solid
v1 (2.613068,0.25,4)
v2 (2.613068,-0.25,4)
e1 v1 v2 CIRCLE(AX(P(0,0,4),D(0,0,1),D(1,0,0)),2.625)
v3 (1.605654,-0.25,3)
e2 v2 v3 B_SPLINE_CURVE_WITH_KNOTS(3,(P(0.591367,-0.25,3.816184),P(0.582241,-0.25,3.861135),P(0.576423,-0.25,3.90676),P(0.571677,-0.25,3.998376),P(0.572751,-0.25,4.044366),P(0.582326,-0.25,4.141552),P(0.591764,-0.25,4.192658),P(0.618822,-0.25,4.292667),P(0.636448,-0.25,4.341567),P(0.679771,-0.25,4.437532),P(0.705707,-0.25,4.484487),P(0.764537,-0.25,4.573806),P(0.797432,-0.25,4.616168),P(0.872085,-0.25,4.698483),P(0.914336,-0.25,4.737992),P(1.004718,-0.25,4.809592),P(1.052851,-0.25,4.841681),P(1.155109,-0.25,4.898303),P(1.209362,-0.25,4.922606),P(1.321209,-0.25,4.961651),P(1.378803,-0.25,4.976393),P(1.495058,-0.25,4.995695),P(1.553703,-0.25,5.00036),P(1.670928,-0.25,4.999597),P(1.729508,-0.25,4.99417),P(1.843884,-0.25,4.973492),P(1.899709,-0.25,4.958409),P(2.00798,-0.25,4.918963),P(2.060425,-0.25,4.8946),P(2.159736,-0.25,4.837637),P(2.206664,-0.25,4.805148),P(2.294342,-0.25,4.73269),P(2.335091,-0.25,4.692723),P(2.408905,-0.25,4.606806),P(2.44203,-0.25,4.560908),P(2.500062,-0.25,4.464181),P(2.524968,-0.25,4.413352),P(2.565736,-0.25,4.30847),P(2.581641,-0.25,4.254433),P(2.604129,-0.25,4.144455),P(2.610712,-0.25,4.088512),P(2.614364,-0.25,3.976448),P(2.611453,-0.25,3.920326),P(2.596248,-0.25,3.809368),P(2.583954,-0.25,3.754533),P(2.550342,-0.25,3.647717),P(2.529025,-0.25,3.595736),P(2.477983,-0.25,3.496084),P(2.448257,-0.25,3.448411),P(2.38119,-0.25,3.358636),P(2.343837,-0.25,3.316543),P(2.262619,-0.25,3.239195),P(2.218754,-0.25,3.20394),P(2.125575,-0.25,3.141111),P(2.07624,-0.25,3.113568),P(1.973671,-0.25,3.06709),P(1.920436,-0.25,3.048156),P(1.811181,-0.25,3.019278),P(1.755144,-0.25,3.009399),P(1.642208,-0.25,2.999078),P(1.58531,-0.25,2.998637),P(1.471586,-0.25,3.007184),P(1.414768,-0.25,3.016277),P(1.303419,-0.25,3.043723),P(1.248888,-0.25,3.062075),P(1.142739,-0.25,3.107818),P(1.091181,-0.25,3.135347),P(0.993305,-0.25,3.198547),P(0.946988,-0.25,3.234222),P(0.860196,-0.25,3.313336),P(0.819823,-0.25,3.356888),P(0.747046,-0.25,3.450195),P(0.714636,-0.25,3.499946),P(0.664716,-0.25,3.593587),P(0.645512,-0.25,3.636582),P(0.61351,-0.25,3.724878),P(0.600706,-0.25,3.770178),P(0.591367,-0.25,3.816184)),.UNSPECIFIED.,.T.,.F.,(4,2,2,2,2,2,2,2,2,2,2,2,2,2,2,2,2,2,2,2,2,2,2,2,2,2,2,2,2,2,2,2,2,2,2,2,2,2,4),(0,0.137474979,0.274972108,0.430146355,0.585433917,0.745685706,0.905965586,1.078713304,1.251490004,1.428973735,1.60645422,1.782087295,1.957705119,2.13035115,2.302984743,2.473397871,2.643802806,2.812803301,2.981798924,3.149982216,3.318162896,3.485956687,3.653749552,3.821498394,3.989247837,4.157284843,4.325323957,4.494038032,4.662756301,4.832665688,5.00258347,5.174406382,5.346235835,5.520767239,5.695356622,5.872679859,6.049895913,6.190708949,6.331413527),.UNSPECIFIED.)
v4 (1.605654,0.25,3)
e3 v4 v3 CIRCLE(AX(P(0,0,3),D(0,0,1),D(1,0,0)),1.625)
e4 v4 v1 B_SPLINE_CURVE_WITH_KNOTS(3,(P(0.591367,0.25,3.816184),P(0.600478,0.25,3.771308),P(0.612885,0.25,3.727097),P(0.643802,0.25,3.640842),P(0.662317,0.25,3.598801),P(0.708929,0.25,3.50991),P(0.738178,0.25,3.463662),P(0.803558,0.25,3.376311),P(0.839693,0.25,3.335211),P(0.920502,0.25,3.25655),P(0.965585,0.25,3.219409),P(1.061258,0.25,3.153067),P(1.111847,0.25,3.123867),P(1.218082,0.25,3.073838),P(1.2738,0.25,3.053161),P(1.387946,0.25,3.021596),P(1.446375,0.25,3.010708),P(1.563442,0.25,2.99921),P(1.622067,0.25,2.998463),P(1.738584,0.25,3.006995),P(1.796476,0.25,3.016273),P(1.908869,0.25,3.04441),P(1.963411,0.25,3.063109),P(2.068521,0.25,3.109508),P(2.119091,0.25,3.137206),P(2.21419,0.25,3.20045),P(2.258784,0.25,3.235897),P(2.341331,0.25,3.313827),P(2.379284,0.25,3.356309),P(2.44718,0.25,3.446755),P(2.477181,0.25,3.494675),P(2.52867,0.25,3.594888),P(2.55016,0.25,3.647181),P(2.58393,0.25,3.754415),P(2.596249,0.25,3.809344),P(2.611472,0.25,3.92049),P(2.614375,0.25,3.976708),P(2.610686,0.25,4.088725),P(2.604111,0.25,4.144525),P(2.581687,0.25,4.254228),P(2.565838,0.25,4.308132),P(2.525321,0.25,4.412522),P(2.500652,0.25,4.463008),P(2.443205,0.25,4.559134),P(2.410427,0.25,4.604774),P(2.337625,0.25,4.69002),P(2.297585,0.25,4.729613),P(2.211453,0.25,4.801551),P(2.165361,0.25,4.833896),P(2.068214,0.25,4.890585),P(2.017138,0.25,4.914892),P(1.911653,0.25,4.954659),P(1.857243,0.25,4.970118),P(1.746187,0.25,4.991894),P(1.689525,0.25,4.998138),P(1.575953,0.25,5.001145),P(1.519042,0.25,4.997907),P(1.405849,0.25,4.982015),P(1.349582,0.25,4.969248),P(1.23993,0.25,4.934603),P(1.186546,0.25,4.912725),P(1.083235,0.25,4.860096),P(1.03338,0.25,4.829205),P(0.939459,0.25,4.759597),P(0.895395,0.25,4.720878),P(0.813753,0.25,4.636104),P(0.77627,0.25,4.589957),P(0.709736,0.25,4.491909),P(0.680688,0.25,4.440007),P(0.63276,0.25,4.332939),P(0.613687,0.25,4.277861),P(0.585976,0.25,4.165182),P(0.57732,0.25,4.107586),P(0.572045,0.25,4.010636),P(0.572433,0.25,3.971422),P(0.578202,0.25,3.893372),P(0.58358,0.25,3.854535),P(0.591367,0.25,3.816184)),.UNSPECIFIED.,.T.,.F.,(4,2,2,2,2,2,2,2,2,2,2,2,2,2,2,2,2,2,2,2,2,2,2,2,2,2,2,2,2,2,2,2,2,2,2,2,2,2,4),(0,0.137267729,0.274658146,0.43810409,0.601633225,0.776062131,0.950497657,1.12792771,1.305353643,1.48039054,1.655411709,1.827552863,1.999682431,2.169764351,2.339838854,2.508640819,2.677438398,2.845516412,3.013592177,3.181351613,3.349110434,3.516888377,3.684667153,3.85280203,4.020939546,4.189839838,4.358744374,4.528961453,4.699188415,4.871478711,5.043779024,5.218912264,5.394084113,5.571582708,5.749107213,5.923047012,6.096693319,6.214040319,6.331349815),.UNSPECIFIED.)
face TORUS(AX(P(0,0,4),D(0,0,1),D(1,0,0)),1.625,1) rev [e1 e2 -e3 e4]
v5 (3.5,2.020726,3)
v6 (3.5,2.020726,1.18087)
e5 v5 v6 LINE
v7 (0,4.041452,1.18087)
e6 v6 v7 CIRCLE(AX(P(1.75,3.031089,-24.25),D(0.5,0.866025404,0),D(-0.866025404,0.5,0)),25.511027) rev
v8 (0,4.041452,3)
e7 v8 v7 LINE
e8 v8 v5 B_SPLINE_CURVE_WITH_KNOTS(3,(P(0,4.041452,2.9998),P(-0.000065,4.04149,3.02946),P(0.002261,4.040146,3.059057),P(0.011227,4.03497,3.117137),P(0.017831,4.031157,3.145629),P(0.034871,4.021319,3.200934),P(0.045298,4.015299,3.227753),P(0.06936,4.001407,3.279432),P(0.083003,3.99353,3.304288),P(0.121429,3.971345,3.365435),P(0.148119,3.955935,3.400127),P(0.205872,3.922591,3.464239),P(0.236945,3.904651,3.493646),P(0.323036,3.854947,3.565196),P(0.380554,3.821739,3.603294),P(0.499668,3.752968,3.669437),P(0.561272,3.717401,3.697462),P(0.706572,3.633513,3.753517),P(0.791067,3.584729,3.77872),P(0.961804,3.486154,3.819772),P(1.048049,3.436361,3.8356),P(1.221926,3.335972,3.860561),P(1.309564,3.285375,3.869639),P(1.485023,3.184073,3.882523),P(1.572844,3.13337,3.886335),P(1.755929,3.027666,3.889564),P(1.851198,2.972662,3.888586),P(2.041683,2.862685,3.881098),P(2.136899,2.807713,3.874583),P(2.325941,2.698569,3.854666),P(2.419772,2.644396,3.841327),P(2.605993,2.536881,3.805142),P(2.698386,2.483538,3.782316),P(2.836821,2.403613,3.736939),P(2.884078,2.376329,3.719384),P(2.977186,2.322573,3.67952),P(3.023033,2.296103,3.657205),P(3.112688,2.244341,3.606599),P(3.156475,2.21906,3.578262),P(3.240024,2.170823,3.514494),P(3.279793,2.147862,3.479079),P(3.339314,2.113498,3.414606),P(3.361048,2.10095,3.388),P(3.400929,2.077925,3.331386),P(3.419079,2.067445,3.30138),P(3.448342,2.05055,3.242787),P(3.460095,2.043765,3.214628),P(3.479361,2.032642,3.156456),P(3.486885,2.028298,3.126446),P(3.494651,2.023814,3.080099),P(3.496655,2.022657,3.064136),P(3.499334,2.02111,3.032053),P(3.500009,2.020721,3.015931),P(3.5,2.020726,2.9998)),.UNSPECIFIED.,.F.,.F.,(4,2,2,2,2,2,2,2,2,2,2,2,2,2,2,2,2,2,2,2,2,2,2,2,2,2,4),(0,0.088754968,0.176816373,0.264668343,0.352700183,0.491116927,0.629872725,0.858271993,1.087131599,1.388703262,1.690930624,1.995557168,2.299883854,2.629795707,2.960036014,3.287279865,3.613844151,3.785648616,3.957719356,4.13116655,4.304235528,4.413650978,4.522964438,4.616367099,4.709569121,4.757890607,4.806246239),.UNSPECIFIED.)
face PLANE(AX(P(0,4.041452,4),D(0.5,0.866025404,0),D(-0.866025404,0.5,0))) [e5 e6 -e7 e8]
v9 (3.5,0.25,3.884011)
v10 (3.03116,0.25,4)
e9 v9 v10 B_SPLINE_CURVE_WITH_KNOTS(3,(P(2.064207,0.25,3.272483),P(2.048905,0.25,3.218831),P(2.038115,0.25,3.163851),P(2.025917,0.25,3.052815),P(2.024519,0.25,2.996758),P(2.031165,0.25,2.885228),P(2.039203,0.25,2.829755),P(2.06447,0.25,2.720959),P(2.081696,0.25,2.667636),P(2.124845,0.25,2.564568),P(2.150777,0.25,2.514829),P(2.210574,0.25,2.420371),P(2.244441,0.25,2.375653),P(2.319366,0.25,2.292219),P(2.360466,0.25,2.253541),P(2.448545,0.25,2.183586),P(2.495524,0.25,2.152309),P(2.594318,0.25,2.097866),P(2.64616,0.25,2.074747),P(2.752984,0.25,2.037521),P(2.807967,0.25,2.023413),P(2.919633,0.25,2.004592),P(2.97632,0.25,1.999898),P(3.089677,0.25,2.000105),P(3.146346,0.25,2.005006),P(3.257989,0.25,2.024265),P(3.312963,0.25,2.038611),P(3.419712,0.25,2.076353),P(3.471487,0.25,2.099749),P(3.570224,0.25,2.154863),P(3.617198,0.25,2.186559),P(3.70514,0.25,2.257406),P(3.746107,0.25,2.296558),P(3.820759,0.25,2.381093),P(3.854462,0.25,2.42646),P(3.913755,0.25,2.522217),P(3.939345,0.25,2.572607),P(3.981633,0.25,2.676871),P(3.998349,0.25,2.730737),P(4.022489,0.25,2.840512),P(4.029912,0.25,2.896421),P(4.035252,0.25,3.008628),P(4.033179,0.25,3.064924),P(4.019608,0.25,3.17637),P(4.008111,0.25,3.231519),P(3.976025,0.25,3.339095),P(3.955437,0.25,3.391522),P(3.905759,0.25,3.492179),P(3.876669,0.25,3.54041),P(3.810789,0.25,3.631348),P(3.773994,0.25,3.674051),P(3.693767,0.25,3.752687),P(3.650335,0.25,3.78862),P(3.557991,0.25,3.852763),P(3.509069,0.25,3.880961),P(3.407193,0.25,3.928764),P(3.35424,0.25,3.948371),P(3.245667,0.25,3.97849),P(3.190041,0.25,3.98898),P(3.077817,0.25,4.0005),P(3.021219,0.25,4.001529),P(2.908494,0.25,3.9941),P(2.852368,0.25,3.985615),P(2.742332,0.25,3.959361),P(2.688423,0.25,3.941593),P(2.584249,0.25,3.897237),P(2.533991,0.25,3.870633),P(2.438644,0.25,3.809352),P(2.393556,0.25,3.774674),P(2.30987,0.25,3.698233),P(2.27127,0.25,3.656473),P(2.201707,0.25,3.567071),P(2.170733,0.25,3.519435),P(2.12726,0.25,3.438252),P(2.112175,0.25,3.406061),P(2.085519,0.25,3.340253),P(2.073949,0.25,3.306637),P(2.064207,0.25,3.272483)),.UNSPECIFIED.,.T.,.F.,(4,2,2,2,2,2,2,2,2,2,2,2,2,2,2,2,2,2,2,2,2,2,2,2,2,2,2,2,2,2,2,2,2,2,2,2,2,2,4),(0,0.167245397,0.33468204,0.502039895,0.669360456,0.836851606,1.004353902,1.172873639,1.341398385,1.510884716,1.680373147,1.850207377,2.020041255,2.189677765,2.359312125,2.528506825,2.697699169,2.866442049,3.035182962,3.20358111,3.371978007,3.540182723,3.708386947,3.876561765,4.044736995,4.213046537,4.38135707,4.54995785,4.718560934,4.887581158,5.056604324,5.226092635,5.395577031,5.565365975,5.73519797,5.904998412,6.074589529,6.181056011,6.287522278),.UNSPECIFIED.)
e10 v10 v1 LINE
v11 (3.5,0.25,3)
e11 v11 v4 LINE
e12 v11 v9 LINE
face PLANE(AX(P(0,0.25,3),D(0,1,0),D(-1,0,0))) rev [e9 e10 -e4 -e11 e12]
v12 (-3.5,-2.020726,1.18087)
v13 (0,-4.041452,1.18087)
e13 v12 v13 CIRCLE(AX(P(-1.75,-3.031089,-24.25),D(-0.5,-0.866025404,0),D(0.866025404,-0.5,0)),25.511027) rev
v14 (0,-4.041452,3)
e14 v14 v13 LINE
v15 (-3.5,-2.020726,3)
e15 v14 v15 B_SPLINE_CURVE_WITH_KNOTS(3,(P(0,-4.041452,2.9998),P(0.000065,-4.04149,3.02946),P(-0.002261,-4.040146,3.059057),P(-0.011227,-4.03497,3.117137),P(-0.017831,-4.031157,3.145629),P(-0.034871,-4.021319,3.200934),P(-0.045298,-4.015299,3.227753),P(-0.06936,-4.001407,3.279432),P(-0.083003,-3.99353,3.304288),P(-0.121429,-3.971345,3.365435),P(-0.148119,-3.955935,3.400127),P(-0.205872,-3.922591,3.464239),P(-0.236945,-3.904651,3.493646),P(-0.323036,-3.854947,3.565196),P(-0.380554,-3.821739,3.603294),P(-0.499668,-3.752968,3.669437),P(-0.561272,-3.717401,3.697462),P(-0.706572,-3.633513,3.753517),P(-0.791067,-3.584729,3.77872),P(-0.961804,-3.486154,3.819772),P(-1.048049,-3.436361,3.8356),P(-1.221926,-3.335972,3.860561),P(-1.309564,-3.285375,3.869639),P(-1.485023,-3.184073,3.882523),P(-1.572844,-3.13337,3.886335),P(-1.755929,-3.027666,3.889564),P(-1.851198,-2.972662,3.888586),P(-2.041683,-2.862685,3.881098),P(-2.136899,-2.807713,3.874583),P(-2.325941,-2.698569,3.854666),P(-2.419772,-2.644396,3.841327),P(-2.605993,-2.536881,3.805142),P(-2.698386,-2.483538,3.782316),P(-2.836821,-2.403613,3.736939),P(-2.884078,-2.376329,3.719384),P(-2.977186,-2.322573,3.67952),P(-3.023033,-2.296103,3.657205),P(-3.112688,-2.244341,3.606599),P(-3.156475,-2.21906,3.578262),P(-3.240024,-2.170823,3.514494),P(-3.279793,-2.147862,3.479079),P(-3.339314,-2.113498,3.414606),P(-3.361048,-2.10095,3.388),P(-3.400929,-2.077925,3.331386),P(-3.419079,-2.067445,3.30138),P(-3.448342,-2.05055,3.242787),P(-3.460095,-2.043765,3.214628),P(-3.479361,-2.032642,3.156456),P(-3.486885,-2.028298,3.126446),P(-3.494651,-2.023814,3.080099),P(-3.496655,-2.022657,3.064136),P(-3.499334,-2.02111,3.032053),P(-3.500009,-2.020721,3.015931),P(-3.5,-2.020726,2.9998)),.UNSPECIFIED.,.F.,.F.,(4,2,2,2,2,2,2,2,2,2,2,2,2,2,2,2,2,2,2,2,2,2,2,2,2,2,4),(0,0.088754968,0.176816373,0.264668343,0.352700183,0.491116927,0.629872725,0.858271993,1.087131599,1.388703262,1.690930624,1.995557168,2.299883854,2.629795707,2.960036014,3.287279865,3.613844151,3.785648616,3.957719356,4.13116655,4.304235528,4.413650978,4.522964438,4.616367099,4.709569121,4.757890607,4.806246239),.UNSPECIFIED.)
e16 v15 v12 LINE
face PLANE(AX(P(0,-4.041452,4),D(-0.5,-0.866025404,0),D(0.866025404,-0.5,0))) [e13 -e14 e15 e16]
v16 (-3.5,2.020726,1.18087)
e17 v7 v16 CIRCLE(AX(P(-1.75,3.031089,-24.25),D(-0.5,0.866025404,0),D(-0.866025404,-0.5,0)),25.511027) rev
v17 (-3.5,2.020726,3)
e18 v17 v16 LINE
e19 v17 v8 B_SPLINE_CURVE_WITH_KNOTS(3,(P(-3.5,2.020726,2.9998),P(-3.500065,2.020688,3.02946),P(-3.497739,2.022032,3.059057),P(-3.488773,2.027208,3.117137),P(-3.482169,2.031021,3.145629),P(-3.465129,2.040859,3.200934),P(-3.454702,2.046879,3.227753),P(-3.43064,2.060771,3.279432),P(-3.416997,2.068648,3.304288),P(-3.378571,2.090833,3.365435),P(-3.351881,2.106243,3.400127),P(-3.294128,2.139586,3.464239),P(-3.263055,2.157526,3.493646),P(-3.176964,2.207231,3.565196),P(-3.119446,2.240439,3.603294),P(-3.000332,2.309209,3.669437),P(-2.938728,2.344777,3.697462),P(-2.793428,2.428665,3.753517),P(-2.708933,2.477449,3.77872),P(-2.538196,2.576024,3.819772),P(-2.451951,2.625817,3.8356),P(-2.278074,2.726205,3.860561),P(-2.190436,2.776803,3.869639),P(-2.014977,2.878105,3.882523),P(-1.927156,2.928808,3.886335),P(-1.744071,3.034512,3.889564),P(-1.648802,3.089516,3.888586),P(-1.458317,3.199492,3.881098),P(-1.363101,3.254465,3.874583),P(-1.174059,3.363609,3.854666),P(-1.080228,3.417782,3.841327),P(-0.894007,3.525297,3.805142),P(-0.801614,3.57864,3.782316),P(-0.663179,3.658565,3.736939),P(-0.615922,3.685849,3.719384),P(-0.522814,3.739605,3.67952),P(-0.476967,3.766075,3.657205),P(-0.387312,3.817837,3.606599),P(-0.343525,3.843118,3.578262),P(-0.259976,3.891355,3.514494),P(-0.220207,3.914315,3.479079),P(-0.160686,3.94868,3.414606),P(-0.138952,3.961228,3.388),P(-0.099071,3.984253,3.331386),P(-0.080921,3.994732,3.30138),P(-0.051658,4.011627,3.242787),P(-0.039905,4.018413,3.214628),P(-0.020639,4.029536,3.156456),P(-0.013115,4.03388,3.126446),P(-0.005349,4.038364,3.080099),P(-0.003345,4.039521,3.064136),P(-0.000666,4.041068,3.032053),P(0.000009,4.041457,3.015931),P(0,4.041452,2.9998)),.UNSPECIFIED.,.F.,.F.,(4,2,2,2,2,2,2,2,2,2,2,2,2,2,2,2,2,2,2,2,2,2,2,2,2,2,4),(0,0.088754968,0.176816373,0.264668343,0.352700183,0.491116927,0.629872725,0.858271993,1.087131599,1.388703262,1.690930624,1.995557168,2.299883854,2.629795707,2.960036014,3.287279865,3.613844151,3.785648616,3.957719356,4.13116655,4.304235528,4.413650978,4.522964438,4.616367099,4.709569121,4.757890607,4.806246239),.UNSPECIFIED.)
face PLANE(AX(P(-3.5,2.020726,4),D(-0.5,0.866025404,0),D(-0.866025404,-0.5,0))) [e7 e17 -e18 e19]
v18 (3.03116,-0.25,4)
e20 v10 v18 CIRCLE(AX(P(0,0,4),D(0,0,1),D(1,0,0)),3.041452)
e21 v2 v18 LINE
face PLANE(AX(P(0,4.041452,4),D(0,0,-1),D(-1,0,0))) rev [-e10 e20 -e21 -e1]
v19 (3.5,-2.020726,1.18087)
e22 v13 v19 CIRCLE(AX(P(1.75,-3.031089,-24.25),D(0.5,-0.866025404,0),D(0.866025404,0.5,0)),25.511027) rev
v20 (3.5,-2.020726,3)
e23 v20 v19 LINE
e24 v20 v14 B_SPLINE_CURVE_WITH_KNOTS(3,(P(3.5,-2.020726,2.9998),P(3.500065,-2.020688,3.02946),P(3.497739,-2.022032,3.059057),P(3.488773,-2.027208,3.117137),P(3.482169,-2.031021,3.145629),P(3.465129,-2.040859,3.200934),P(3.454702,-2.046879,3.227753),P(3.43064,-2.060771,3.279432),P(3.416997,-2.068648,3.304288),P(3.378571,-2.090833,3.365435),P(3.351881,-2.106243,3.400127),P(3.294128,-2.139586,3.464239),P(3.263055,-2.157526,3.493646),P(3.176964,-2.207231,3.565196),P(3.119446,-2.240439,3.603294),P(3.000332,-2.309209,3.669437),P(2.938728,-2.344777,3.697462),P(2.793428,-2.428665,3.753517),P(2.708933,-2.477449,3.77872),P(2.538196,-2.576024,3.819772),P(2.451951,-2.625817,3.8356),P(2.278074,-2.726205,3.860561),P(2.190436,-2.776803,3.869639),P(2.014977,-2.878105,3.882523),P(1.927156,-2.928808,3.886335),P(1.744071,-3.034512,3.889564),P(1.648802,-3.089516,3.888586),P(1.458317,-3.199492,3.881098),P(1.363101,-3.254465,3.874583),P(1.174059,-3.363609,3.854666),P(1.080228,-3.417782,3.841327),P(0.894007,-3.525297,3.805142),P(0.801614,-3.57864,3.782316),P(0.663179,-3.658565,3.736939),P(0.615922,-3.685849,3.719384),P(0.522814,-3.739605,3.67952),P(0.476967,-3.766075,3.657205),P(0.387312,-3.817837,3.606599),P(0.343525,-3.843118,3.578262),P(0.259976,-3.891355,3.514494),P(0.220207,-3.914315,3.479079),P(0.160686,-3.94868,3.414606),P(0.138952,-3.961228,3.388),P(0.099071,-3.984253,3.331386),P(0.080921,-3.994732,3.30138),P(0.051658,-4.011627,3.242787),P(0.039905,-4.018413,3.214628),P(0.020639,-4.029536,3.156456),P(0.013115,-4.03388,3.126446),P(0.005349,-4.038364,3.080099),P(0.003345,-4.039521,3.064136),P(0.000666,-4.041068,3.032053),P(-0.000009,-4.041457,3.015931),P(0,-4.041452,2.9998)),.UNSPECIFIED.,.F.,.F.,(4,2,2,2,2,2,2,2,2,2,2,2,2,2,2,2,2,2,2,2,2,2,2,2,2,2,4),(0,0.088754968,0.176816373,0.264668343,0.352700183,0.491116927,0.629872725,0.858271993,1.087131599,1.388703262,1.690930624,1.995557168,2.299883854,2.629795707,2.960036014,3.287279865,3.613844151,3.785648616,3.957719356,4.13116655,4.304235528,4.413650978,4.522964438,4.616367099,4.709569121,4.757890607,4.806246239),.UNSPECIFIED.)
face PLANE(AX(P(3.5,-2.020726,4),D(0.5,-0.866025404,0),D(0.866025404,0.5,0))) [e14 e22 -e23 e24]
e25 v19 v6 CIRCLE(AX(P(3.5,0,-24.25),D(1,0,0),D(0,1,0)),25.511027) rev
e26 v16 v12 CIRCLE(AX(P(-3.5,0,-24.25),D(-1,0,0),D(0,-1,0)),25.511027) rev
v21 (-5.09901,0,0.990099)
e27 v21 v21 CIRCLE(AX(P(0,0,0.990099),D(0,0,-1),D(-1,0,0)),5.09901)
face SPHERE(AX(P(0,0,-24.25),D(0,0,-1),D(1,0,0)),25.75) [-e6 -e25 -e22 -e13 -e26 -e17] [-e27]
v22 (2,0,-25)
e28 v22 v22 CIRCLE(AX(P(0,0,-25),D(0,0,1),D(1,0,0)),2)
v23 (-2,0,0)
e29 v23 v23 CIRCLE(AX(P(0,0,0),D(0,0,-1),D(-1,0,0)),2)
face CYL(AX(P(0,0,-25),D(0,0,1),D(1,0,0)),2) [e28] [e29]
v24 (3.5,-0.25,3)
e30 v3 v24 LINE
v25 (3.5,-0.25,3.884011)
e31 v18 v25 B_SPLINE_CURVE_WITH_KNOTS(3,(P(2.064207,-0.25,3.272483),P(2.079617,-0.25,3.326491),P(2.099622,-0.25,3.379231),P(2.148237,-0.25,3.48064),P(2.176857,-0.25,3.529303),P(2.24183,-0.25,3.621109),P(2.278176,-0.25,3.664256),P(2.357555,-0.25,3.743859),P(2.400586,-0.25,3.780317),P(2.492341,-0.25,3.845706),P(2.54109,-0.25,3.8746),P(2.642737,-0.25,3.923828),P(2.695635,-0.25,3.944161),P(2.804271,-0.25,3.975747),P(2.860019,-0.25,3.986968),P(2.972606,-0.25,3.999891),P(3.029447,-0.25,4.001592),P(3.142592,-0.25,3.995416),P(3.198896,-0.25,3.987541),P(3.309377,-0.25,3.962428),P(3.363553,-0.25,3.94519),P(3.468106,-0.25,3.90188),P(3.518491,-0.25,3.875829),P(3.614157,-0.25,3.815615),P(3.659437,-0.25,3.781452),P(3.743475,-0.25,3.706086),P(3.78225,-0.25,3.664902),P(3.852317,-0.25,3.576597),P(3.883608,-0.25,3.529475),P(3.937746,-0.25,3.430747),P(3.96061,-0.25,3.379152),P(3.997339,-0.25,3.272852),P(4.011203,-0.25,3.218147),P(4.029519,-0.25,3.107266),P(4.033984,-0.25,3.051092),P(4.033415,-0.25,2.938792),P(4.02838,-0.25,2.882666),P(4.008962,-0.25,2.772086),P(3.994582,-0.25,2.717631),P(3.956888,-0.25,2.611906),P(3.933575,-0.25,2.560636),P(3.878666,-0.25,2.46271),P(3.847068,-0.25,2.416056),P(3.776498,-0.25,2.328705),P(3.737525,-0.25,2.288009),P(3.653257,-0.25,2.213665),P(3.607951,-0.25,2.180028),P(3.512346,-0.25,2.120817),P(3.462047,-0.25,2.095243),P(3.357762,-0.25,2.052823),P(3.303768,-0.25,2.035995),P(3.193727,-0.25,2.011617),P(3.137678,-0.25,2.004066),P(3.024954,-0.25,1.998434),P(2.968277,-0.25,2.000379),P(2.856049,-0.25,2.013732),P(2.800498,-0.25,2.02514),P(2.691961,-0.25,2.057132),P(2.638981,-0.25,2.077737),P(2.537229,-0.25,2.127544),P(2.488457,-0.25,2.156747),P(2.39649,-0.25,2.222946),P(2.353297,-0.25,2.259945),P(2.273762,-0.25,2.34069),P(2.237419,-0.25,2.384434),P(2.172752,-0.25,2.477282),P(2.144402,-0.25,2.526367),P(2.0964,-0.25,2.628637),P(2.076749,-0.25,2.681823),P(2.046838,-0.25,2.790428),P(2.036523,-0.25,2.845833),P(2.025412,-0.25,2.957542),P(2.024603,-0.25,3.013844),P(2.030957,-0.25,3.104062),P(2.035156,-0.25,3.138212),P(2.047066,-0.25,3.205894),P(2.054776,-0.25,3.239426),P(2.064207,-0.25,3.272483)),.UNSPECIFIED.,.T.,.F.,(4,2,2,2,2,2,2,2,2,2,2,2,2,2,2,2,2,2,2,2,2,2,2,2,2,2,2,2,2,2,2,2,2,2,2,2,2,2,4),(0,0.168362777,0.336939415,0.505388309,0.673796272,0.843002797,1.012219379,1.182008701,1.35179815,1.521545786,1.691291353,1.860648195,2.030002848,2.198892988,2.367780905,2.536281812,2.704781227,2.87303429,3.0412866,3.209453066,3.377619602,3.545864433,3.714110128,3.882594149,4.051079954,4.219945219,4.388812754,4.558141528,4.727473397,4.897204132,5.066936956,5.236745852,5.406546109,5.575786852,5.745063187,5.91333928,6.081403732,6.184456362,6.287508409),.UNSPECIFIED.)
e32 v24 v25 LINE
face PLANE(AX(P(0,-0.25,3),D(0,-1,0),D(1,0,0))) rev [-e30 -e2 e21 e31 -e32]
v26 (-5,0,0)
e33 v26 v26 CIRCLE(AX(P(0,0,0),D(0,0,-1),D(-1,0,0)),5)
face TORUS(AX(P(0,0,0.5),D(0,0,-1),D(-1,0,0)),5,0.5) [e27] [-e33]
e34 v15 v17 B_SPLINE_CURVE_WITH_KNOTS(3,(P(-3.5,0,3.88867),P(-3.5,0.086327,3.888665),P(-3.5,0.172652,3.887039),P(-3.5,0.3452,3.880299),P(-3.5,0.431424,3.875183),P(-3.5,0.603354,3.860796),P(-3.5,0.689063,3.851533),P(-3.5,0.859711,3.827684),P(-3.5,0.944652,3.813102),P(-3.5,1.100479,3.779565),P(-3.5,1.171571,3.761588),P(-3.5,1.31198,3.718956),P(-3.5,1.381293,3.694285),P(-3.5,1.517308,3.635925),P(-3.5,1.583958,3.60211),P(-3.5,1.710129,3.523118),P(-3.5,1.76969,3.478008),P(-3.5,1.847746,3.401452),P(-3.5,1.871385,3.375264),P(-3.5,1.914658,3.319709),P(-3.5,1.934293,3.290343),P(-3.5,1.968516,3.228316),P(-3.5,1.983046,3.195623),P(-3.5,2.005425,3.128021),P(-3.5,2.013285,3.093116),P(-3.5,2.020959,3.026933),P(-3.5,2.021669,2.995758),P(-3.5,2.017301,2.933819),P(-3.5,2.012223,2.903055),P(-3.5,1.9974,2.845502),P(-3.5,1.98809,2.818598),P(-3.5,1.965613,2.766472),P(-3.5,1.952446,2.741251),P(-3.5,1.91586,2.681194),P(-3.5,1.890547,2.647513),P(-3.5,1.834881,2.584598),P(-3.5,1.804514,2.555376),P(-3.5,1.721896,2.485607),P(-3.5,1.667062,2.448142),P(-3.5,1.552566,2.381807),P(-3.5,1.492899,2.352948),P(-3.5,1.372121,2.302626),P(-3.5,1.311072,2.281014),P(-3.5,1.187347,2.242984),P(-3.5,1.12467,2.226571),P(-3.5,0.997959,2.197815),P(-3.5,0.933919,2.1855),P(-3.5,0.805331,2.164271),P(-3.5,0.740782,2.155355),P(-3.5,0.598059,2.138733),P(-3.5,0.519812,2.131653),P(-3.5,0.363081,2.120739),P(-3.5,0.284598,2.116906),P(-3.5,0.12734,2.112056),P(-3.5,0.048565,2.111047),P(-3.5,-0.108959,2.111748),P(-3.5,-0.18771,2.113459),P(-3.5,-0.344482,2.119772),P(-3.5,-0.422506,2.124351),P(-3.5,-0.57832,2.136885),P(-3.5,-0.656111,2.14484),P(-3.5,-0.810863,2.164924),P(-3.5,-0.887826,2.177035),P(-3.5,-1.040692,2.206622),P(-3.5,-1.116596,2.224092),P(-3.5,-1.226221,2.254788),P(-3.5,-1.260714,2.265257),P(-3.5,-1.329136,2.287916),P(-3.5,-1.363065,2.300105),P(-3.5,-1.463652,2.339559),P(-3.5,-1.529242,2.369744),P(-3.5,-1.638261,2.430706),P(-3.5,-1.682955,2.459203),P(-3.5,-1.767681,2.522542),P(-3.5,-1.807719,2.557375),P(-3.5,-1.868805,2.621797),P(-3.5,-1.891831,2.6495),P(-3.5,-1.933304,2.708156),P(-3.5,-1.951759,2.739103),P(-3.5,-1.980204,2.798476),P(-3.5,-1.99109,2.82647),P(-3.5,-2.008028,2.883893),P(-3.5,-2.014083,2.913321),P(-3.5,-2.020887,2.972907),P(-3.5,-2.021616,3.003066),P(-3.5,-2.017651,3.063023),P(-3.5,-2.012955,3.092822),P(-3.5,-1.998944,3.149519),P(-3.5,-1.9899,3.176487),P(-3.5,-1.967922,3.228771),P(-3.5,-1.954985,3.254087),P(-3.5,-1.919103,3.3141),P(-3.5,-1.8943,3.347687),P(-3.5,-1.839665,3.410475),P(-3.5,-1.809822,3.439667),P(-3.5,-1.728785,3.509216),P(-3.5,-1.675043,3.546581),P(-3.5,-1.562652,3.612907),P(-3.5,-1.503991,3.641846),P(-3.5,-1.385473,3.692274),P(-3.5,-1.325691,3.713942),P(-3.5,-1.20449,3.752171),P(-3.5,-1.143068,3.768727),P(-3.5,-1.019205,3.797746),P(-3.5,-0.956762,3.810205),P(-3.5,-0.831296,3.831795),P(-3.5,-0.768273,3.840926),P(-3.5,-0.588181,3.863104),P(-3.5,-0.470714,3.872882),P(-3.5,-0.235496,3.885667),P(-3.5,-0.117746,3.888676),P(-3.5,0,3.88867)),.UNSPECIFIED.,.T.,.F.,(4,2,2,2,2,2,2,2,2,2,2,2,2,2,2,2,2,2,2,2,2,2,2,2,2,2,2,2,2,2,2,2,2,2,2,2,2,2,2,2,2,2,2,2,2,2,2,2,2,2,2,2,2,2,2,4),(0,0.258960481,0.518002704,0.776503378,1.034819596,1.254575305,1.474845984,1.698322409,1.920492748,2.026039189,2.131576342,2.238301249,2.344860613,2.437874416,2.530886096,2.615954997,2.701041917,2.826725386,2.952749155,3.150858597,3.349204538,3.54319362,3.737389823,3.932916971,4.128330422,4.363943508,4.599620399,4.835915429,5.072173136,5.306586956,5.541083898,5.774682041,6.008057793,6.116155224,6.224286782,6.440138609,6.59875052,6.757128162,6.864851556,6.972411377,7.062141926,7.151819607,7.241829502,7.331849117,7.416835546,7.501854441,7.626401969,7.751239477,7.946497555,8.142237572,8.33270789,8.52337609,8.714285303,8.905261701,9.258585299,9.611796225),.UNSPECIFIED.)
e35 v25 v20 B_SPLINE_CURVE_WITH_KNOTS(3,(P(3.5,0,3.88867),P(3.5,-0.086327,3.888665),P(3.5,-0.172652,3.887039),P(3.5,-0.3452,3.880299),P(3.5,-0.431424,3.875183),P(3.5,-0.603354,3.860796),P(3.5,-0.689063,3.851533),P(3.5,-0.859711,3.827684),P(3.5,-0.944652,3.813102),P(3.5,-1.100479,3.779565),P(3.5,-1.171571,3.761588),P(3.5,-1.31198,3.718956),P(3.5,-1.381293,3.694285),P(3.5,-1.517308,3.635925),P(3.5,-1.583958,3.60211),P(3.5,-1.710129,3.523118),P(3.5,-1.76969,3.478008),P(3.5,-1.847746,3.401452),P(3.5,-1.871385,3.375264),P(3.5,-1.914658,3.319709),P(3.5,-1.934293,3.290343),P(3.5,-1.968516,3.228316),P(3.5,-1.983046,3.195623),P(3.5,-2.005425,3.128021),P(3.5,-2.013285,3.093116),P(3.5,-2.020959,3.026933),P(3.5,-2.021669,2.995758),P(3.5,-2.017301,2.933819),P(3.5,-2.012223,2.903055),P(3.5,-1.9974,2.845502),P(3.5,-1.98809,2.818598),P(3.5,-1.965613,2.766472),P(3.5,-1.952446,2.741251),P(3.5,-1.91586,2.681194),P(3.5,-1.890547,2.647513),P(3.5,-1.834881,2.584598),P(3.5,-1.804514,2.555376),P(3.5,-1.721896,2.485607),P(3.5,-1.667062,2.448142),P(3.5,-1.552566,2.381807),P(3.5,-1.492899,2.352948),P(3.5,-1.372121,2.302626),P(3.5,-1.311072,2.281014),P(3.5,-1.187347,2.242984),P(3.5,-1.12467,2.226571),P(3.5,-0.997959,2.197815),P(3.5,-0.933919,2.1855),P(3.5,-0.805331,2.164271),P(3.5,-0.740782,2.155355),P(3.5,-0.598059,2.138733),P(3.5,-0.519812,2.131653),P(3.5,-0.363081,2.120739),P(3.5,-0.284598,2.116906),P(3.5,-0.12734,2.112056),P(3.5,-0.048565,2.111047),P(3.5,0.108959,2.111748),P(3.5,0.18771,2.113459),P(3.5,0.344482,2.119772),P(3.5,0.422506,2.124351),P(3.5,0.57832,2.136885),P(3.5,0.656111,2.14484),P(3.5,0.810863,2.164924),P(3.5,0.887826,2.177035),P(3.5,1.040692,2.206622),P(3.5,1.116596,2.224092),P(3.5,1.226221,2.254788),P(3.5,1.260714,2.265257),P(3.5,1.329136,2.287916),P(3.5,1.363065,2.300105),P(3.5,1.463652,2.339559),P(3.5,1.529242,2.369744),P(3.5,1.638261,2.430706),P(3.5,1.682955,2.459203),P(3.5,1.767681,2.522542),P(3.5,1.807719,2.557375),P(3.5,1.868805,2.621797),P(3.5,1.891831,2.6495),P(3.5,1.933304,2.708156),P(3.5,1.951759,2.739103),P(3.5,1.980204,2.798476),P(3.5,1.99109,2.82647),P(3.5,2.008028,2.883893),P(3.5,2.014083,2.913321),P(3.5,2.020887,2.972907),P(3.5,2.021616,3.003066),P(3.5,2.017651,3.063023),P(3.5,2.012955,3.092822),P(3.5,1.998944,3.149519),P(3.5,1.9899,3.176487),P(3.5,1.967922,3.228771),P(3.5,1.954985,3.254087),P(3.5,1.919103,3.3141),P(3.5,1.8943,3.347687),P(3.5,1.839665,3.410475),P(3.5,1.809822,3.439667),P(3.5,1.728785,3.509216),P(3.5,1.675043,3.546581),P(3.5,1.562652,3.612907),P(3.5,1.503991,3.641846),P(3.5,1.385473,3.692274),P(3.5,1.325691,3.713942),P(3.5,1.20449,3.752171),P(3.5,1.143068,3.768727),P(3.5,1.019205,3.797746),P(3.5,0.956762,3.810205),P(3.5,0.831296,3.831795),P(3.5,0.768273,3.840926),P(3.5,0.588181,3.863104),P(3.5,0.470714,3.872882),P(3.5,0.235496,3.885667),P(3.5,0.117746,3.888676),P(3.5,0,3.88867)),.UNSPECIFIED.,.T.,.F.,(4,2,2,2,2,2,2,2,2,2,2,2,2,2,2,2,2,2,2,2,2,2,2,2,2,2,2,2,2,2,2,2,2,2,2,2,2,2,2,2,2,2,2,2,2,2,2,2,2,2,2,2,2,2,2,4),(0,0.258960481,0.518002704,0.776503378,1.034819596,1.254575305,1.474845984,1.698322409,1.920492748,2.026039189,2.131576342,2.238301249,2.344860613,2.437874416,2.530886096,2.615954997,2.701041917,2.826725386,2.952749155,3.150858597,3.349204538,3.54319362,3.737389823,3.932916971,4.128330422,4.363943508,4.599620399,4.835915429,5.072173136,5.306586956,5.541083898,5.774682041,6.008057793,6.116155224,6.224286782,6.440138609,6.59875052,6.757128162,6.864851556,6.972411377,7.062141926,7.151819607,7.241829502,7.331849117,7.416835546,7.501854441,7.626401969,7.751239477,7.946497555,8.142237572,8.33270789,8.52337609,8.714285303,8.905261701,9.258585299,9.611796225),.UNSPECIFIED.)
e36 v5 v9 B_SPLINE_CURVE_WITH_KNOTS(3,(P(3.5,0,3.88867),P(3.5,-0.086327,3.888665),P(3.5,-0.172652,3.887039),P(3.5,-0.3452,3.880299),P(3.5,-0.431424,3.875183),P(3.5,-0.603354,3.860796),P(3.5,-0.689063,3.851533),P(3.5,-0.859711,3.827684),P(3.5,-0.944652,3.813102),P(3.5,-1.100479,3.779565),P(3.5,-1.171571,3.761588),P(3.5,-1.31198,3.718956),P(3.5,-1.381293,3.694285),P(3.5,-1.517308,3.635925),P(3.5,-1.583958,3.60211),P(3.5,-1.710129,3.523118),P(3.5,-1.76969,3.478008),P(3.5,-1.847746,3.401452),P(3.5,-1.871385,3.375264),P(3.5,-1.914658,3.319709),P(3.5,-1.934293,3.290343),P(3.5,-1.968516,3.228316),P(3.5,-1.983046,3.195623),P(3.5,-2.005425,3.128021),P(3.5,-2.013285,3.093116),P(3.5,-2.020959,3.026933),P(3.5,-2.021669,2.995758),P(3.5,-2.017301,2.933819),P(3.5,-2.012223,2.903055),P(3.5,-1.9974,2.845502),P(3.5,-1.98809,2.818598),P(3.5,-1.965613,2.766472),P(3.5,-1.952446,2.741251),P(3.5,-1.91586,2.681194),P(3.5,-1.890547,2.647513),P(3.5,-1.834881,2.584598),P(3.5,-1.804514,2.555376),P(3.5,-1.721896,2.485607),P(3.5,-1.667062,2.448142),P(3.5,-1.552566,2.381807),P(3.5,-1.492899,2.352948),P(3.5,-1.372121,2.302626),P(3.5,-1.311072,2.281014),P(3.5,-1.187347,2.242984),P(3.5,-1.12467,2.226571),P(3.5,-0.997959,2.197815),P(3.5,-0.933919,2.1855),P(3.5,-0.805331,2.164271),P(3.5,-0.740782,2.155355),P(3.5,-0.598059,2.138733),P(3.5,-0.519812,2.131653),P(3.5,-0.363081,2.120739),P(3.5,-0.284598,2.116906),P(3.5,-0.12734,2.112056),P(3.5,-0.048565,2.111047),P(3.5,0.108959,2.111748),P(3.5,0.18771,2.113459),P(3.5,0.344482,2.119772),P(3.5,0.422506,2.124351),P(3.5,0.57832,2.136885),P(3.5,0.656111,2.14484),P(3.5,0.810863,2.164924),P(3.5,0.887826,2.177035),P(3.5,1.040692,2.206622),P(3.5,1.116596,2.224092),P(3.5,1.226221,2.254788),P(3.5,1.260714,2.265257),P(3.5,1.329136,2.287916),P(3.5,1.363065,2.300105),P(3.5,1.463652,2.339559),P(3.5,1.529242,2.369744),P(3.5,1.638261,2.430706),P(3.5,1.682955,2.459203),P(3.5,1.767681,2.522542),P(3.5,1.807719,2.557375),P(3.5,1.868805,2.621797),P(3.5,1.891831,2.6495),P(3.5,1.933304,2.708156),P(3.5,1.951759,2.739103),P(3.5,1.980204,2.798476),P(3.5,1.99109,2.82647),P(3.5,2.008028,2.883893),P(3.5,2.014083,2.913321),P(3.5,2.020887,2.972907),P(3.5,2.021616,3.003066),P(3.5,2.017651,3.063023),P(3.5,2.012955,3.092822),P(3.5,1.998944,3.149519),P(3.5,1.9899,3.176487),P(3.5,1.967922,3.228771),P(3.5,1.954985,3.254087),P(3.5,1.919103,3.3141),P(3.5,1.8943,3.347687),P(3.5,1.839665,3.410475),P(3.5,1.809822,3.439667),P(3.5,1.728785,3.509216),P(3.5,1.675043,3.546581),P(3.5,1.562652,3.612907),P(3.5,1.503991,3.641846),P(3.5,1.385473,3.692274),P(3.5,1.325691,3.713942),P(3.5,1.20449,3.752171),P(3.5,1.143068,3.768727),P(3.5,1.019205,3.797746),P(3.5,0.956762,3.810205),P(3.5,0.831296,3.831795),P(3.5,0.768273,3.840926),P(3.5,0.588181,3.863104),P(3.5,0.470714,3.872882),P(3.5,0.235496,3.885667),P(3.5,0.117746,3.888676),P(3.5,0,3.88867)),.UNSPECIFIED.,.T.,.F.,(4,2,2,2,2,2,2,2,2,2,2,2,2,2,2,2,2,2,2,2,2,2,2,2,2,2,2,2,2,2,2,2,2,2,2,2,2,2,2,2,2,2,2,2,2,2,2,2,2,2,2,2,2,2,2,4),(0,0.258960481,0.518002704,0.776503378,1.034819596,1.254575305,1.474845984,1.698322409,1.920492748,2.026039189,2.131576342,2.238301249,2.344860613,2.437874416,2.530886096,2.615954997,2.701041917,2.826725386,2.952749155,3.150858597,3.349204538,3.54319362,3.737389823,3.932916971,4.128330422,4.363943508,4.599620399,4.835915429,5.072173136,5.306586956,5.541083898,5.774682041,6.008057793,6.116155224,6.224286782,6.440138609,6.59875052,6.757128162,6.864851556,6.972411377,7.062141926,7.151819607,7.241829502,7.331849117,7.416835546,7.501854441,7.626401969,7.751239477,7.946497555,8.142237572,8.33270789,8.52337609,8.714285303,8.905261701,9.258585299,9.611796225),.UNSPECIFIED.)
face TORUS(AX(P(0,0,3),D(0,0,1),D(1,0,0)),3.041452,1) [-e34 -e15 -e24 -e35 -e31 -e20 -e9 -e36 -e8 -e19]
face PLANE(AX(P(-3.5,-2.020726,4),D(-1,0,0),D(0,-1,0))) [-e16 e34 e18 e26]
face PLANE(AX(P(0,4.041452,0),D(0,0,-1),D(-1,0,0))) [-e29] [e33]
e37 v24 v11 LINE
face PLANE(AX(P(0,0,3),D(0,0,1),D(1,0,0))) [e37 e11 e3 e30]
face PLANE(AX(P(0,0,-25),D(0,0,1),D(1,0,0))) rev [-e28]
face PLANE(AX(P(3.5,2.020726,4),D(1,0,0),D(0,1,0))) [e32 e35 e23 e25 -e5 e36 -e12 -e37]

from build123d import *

# Parameters (mm, degrees)
HEAD_DEPTH         = 4
SHANK_SKETCH_R     = 2
SHANK_DEPTH        = 25
SKETCH6_R          = 2.625
HEAD_CUT_DEPTH     = 1
FILLET1_R          = 1
SKETCH7_W          = 3.5
SKETCH7_H          = 0.5
CUT_EXTRUDE1_DEPTH = 1


with BuildPart() as part:
    # Head Sketch → Head (new body)
    with BuildSketch(Plane.XY):
        Polygon((0, 4.041451884), (3.5, 2.020725942), (3.5, -2.020725942), (0, -4.041451884), (-3.5, -2.020725942), (-3.5, 2.020725942), align=None)
    extrude(amount=HEAD_DEPTH)

    # Shank Sketch → Shank (add)
    with BuildSketch(Plane.XY):
        Circle(SHANK_SKETCH_R)
    extrude(amount=-SHANK_DEPTH)

    # Sketch3 → Flange (revolve)
    with BuildSketch(Plane(origin=(0, 0, 0), x_dir=(-1, 0, 0), z_dir=(0, 1, 0)), mode=Mode.PRIVATE) as flange_sk:
        with BuildLine():
            Line((-5, 0), (0, 0))
            Line((0, 0), (0, 1.5))
            ThreePointArc((0, 1.5), (-2.562220765, 1.372207648), (-5.099009901, 0.99009901))
            ThreePointArc((-5.099009901, 0.99009901), (-5.497518595, 0.45024814), (-5, 0))
        make_face()
    revolve(flange_sk.sketch.rotate(Axis((0, 0, 0), (0, 0, 1)), 30), axis=Axis((0, 0, 0), (0, 0, 1)))

    # Sketch5 → Head Trim (revolve, cut)
    with BuildSketch(Plane(origin=(0, 0, 0), x_dir=(0, 0, -1), z_dir=(1, 0, 0)), mode=Mode.PRIVATE) as head_trim_sk:
        with BuildLine():
            Line((-4, -3.041451884), (-4, -4.041451884))
            Line((-4, -4.041451884), (-3, -4.041451884))
            ThreePointArc((-3, -4.041451884), (-3.707106781, -3.748558666), (-4, -3.041451884))
        make_face()
    revolve(head_trim_sk.sketch.rotate(Axis((0, 0, 15.085599173), (0, 0, -1)), 90), axis=Axis((0, 0, 15.085599173), (0, 0, -1)), mode=Mode.SUBTRACT)

    # Sketch6 → Head Cut (cut)
    with BuildSketch(Plane.XY.offset(4)):
        Circle(SKETCH6_R)
    extrude(amount=-HEAD_CUT_DEPTH, mode=Mode.SUBTRACT)

    # Fillet1
    fillet1_edges = [part.edges().sort_by_distance(p)[0] for p in [
        (-2.625, 0, 3),
    ]]
    fillet(fillet1_edges, radius=FILLET1_R - 0.0001)  # a hair under: the kernel refuses the full size

    # Sketch7 → Cut-Extrude1 (cut)
    with BuildSketch(Plane(origin=(0.741825606, 1.407208117, 4), x_dir=(1, 0, 0), z_dir=(0, 0, 1))):
        with Locations((1.008174394, -1.407208117)):
            Rectangle(SKETCH7_W, SKETCH7_H)
    extrude(amount=-CUT_EXTRUDE1_DEPTH, mode=Mode.SUBTRACT)


solid = part.part
